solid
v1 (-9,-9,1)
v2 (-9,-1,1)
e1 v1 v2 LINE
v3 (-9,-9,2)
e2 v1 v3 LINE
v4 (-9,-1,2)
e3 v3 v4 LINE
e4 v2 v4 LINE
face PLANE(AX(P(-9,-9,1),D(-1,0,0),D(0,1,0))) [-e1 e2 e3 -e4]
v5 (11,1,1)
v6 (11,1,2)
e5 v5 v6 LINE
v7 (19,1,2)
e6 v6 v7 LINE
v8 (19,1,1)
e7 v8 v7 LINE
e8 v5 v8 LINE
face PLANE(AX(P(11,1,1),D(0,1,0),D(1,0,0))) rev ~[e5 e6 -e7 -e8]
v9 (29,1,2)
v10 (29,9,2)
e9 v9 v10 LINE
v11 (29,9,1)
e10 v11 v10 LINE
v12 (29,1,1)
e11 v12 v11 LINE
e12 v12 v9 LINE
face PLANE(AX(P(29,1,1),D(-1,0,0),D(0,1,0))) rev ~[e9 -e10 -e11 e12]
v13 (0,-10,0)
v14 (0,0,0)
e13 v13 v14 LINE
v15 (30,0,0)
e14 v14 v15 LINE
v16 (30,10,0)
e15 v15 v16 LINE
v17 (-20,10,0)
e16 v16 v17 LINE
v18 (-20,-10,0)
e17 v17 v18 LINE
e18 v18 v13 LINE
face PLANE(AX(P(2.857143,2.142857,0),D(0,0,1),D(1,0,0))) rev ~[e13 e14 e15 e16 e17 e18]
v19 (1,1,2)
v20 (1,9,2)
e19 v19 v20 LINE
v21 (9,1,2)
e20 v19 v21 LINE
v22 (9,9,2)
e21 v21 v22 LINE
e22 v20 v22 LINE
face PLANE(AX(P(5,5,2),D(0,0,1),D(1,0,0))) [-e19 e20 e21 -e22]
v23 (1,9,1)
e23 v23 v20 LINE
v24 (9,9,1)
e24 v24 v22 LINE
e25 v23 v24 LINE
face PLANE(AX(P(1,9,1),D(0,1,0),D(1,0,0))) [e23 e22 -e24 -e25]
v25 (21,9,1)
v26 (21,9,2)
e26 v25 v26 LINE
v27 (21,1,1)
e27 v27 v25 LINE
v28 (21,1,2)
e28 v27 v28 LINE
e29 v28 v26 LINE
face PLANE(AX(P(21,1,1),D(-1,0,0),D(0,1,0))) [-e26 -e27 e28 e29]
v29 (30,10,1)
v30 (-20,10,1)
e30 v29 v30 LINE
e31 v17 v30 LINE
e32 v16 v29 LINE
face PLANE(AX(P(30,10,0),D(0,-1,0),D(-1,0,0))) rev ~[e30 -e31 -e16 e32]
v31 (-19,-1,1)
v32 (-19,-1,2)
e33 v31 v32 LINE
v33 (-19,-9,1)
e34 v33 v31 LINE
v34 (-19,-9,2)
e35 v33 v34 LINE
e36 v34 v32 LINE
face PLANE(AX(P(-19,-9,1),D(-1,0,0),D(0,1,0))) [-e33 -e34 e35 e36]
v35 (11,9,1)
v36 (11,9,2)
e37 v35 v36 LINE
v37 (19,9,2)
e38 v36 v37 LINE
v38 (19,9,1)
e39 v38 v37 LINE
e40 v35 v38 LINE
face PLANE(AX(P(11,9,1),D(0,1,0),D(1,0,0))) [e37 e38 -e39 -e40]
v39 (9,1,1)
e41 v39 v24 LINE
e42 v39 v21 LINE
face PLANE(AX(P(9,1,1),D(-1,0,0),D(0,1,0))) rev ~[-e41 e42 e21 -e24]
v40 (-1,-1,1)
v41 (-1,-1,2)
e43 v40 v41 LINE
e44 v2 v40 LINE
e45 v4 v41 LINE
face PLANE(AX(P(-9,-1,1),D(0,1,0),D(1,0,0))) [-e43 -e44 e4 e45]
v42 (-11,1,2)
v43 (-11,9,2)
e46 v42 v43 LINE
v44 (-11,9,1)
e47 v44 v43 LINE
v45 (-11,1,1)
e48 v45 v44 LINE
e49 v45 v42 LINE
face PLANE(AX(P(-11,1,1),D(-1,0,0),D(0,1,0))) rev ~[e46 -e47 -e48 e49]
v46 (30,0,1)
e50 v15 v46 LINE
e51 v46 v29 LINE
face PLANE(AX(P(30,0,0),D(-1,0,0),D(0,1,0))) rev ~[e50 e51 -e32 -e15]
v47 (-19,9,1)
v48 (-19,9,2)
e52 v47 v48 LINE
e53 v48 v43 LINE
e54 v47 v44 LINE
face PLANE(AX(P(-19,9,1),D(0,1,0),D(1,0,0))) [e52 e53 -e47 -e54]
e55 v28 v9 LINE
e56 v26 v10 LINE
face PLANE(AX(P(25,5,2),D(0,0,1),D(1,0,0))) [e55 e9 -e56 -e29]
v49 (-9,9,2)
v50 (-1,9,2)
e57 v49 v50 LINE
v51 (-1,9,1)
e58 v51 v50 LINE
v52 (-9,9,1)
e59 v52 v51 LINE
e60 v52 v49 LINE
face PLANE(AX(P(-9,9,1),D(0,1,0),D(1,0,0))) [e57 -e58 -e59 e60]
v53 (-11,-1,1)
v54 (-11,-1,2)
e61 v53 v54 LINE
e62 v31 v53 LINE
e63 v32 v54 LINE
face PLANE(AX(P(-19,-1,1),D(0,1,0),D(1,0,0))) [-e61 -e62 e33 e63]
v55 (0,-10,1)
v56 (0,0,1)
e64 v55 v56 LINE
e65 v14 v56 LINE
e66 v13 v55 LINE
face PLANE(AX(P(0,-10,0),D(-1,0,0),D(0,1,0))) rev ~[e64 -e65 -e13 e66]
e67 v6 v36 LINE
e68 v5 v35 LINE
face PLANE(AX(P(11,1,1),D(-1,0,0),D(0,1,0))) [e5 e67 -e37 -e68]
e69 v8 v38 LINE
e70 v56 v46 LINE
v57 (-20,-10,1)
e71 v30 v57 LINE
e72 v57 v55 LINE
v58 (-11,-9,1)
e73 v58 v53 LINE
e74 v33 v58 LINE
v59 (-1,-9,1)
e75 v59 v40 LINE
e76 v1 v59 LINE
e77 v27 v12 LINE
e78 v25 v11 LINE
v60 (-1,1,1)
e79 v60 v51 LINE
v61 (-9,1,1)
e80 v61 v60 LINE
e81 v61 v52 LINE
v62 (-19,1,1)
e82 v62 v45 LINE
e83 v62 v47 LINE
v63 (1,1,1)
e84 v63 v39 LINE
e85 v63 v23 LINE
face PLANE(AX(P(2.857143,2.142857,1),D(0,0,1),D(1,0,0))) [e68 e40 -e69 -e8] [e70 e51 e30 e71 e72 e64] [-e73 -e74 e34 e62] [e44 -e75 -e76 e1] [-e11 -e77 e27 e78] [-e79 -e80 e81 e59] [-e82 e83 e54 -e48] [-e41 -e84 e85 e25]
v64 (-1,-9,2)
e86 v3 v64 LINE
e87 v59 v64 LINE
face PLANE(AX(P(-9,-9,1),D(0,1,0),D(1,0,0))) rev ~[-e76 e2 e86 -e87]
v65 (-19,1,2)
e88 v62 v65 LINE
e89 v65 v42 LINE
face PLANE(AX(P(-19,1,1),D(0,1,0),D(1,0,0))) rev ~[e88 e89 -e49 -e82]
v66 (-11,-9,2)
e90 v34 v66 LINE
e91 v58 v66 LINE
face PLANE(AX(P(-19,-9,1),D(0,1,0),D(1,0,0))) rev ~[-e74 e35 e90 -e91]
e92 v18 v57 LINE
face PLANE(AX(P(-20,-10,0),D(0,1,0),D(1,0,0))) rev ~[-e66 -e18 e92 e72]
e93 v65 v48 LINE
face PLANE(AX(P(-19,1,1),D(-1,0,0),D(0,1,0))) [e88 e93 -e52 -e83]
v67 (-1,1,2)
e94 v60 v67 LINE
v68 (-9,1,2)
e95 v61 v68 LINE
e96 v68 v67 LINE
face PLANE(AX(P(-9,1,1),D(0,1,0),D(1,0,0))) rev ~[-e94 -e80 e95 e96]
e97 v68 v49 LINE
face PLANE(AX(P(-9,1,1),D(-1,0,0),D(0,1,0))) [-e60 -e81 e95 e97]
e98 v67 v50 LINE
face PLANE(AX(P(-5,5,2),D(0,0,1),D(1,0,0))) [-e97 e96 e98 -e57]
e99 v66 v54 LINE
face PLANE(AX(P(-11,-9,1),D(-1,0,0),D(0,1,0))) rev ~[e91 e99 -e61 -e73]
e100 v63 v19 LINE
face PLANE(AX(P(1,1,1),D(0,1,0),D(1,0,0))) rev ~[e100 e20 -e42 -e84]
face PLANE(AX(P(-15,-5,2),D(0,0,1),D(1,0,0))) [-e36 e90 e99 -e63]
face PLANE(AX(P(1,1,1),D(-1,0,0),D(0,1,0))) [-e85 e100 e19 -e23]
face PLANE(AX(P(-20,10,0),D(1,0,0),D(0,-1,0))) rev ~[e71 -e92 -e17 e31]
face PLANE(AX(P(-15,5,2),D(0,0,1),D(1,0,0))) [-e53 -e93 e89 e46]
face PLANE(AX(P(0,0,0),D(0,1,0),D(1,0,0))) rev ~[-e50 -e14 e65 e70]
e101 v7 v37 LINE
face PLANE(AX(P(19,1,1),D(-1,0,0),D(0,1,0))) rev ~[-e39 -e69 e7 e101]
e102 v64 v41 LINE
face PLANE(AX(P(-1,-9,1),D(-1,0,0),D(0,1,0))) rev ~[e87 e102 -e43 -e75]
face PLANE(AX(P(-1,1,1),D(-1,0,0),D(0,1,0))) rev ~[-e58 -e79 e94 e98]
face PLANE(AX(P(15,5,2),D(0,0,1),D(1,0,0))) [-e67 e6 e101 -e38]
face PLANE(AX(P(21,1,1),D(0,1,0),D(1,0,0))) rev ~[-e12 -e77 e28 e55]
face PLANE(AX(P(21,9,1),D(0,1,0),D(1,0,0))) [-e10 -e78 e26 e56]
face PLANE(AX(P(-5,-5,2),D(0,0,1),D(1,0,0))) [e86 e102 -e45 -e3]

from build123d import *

# Parameters (mm, degrees)
F1_DEPTH = 1
F2_W     = 8
F2_H     = 8
F3_DEPTH = 1


# Not quite as in the source:
# - a feature names something its author has since deleted; it is built from what else it names


with BuildPart() as f1:
    # F0 (on Top) → F1 (new body)
    with BuildSketch(Plane.XY):
        Polygon((30, 10), (-20, 10), (-20, -10), (0, -10), (0, 0), (30, 0), align=None)
    extrude(amount=F1_DEPTH)

    # F2 (on face) → F3 (join)
    with BuildSketch(Plane.XY.offset(1)):
        with Locations((-15, 5)):
            Rectangle(F2_W, F2_H)
        with Locations((-15, -5)):
            Rectangle(F2_W, F2_H)
        with Locations((-5, -5)):
            Rectangle(F2_W, F2_H)
        with Locations((-5, 5)):
            Rectangle(F2_W, F2_H)
        with Locations((5, 5)):
            Rectangle(F2_W, F2_H)
        with Locations((15, 5)):
            Rectangle(F2_W, F2_H)
        with Locations((25, 5)):
            Rectangle(F2_W, F2_H)
    extrude(amount=F3_DEPTH)


solid = f1.part
